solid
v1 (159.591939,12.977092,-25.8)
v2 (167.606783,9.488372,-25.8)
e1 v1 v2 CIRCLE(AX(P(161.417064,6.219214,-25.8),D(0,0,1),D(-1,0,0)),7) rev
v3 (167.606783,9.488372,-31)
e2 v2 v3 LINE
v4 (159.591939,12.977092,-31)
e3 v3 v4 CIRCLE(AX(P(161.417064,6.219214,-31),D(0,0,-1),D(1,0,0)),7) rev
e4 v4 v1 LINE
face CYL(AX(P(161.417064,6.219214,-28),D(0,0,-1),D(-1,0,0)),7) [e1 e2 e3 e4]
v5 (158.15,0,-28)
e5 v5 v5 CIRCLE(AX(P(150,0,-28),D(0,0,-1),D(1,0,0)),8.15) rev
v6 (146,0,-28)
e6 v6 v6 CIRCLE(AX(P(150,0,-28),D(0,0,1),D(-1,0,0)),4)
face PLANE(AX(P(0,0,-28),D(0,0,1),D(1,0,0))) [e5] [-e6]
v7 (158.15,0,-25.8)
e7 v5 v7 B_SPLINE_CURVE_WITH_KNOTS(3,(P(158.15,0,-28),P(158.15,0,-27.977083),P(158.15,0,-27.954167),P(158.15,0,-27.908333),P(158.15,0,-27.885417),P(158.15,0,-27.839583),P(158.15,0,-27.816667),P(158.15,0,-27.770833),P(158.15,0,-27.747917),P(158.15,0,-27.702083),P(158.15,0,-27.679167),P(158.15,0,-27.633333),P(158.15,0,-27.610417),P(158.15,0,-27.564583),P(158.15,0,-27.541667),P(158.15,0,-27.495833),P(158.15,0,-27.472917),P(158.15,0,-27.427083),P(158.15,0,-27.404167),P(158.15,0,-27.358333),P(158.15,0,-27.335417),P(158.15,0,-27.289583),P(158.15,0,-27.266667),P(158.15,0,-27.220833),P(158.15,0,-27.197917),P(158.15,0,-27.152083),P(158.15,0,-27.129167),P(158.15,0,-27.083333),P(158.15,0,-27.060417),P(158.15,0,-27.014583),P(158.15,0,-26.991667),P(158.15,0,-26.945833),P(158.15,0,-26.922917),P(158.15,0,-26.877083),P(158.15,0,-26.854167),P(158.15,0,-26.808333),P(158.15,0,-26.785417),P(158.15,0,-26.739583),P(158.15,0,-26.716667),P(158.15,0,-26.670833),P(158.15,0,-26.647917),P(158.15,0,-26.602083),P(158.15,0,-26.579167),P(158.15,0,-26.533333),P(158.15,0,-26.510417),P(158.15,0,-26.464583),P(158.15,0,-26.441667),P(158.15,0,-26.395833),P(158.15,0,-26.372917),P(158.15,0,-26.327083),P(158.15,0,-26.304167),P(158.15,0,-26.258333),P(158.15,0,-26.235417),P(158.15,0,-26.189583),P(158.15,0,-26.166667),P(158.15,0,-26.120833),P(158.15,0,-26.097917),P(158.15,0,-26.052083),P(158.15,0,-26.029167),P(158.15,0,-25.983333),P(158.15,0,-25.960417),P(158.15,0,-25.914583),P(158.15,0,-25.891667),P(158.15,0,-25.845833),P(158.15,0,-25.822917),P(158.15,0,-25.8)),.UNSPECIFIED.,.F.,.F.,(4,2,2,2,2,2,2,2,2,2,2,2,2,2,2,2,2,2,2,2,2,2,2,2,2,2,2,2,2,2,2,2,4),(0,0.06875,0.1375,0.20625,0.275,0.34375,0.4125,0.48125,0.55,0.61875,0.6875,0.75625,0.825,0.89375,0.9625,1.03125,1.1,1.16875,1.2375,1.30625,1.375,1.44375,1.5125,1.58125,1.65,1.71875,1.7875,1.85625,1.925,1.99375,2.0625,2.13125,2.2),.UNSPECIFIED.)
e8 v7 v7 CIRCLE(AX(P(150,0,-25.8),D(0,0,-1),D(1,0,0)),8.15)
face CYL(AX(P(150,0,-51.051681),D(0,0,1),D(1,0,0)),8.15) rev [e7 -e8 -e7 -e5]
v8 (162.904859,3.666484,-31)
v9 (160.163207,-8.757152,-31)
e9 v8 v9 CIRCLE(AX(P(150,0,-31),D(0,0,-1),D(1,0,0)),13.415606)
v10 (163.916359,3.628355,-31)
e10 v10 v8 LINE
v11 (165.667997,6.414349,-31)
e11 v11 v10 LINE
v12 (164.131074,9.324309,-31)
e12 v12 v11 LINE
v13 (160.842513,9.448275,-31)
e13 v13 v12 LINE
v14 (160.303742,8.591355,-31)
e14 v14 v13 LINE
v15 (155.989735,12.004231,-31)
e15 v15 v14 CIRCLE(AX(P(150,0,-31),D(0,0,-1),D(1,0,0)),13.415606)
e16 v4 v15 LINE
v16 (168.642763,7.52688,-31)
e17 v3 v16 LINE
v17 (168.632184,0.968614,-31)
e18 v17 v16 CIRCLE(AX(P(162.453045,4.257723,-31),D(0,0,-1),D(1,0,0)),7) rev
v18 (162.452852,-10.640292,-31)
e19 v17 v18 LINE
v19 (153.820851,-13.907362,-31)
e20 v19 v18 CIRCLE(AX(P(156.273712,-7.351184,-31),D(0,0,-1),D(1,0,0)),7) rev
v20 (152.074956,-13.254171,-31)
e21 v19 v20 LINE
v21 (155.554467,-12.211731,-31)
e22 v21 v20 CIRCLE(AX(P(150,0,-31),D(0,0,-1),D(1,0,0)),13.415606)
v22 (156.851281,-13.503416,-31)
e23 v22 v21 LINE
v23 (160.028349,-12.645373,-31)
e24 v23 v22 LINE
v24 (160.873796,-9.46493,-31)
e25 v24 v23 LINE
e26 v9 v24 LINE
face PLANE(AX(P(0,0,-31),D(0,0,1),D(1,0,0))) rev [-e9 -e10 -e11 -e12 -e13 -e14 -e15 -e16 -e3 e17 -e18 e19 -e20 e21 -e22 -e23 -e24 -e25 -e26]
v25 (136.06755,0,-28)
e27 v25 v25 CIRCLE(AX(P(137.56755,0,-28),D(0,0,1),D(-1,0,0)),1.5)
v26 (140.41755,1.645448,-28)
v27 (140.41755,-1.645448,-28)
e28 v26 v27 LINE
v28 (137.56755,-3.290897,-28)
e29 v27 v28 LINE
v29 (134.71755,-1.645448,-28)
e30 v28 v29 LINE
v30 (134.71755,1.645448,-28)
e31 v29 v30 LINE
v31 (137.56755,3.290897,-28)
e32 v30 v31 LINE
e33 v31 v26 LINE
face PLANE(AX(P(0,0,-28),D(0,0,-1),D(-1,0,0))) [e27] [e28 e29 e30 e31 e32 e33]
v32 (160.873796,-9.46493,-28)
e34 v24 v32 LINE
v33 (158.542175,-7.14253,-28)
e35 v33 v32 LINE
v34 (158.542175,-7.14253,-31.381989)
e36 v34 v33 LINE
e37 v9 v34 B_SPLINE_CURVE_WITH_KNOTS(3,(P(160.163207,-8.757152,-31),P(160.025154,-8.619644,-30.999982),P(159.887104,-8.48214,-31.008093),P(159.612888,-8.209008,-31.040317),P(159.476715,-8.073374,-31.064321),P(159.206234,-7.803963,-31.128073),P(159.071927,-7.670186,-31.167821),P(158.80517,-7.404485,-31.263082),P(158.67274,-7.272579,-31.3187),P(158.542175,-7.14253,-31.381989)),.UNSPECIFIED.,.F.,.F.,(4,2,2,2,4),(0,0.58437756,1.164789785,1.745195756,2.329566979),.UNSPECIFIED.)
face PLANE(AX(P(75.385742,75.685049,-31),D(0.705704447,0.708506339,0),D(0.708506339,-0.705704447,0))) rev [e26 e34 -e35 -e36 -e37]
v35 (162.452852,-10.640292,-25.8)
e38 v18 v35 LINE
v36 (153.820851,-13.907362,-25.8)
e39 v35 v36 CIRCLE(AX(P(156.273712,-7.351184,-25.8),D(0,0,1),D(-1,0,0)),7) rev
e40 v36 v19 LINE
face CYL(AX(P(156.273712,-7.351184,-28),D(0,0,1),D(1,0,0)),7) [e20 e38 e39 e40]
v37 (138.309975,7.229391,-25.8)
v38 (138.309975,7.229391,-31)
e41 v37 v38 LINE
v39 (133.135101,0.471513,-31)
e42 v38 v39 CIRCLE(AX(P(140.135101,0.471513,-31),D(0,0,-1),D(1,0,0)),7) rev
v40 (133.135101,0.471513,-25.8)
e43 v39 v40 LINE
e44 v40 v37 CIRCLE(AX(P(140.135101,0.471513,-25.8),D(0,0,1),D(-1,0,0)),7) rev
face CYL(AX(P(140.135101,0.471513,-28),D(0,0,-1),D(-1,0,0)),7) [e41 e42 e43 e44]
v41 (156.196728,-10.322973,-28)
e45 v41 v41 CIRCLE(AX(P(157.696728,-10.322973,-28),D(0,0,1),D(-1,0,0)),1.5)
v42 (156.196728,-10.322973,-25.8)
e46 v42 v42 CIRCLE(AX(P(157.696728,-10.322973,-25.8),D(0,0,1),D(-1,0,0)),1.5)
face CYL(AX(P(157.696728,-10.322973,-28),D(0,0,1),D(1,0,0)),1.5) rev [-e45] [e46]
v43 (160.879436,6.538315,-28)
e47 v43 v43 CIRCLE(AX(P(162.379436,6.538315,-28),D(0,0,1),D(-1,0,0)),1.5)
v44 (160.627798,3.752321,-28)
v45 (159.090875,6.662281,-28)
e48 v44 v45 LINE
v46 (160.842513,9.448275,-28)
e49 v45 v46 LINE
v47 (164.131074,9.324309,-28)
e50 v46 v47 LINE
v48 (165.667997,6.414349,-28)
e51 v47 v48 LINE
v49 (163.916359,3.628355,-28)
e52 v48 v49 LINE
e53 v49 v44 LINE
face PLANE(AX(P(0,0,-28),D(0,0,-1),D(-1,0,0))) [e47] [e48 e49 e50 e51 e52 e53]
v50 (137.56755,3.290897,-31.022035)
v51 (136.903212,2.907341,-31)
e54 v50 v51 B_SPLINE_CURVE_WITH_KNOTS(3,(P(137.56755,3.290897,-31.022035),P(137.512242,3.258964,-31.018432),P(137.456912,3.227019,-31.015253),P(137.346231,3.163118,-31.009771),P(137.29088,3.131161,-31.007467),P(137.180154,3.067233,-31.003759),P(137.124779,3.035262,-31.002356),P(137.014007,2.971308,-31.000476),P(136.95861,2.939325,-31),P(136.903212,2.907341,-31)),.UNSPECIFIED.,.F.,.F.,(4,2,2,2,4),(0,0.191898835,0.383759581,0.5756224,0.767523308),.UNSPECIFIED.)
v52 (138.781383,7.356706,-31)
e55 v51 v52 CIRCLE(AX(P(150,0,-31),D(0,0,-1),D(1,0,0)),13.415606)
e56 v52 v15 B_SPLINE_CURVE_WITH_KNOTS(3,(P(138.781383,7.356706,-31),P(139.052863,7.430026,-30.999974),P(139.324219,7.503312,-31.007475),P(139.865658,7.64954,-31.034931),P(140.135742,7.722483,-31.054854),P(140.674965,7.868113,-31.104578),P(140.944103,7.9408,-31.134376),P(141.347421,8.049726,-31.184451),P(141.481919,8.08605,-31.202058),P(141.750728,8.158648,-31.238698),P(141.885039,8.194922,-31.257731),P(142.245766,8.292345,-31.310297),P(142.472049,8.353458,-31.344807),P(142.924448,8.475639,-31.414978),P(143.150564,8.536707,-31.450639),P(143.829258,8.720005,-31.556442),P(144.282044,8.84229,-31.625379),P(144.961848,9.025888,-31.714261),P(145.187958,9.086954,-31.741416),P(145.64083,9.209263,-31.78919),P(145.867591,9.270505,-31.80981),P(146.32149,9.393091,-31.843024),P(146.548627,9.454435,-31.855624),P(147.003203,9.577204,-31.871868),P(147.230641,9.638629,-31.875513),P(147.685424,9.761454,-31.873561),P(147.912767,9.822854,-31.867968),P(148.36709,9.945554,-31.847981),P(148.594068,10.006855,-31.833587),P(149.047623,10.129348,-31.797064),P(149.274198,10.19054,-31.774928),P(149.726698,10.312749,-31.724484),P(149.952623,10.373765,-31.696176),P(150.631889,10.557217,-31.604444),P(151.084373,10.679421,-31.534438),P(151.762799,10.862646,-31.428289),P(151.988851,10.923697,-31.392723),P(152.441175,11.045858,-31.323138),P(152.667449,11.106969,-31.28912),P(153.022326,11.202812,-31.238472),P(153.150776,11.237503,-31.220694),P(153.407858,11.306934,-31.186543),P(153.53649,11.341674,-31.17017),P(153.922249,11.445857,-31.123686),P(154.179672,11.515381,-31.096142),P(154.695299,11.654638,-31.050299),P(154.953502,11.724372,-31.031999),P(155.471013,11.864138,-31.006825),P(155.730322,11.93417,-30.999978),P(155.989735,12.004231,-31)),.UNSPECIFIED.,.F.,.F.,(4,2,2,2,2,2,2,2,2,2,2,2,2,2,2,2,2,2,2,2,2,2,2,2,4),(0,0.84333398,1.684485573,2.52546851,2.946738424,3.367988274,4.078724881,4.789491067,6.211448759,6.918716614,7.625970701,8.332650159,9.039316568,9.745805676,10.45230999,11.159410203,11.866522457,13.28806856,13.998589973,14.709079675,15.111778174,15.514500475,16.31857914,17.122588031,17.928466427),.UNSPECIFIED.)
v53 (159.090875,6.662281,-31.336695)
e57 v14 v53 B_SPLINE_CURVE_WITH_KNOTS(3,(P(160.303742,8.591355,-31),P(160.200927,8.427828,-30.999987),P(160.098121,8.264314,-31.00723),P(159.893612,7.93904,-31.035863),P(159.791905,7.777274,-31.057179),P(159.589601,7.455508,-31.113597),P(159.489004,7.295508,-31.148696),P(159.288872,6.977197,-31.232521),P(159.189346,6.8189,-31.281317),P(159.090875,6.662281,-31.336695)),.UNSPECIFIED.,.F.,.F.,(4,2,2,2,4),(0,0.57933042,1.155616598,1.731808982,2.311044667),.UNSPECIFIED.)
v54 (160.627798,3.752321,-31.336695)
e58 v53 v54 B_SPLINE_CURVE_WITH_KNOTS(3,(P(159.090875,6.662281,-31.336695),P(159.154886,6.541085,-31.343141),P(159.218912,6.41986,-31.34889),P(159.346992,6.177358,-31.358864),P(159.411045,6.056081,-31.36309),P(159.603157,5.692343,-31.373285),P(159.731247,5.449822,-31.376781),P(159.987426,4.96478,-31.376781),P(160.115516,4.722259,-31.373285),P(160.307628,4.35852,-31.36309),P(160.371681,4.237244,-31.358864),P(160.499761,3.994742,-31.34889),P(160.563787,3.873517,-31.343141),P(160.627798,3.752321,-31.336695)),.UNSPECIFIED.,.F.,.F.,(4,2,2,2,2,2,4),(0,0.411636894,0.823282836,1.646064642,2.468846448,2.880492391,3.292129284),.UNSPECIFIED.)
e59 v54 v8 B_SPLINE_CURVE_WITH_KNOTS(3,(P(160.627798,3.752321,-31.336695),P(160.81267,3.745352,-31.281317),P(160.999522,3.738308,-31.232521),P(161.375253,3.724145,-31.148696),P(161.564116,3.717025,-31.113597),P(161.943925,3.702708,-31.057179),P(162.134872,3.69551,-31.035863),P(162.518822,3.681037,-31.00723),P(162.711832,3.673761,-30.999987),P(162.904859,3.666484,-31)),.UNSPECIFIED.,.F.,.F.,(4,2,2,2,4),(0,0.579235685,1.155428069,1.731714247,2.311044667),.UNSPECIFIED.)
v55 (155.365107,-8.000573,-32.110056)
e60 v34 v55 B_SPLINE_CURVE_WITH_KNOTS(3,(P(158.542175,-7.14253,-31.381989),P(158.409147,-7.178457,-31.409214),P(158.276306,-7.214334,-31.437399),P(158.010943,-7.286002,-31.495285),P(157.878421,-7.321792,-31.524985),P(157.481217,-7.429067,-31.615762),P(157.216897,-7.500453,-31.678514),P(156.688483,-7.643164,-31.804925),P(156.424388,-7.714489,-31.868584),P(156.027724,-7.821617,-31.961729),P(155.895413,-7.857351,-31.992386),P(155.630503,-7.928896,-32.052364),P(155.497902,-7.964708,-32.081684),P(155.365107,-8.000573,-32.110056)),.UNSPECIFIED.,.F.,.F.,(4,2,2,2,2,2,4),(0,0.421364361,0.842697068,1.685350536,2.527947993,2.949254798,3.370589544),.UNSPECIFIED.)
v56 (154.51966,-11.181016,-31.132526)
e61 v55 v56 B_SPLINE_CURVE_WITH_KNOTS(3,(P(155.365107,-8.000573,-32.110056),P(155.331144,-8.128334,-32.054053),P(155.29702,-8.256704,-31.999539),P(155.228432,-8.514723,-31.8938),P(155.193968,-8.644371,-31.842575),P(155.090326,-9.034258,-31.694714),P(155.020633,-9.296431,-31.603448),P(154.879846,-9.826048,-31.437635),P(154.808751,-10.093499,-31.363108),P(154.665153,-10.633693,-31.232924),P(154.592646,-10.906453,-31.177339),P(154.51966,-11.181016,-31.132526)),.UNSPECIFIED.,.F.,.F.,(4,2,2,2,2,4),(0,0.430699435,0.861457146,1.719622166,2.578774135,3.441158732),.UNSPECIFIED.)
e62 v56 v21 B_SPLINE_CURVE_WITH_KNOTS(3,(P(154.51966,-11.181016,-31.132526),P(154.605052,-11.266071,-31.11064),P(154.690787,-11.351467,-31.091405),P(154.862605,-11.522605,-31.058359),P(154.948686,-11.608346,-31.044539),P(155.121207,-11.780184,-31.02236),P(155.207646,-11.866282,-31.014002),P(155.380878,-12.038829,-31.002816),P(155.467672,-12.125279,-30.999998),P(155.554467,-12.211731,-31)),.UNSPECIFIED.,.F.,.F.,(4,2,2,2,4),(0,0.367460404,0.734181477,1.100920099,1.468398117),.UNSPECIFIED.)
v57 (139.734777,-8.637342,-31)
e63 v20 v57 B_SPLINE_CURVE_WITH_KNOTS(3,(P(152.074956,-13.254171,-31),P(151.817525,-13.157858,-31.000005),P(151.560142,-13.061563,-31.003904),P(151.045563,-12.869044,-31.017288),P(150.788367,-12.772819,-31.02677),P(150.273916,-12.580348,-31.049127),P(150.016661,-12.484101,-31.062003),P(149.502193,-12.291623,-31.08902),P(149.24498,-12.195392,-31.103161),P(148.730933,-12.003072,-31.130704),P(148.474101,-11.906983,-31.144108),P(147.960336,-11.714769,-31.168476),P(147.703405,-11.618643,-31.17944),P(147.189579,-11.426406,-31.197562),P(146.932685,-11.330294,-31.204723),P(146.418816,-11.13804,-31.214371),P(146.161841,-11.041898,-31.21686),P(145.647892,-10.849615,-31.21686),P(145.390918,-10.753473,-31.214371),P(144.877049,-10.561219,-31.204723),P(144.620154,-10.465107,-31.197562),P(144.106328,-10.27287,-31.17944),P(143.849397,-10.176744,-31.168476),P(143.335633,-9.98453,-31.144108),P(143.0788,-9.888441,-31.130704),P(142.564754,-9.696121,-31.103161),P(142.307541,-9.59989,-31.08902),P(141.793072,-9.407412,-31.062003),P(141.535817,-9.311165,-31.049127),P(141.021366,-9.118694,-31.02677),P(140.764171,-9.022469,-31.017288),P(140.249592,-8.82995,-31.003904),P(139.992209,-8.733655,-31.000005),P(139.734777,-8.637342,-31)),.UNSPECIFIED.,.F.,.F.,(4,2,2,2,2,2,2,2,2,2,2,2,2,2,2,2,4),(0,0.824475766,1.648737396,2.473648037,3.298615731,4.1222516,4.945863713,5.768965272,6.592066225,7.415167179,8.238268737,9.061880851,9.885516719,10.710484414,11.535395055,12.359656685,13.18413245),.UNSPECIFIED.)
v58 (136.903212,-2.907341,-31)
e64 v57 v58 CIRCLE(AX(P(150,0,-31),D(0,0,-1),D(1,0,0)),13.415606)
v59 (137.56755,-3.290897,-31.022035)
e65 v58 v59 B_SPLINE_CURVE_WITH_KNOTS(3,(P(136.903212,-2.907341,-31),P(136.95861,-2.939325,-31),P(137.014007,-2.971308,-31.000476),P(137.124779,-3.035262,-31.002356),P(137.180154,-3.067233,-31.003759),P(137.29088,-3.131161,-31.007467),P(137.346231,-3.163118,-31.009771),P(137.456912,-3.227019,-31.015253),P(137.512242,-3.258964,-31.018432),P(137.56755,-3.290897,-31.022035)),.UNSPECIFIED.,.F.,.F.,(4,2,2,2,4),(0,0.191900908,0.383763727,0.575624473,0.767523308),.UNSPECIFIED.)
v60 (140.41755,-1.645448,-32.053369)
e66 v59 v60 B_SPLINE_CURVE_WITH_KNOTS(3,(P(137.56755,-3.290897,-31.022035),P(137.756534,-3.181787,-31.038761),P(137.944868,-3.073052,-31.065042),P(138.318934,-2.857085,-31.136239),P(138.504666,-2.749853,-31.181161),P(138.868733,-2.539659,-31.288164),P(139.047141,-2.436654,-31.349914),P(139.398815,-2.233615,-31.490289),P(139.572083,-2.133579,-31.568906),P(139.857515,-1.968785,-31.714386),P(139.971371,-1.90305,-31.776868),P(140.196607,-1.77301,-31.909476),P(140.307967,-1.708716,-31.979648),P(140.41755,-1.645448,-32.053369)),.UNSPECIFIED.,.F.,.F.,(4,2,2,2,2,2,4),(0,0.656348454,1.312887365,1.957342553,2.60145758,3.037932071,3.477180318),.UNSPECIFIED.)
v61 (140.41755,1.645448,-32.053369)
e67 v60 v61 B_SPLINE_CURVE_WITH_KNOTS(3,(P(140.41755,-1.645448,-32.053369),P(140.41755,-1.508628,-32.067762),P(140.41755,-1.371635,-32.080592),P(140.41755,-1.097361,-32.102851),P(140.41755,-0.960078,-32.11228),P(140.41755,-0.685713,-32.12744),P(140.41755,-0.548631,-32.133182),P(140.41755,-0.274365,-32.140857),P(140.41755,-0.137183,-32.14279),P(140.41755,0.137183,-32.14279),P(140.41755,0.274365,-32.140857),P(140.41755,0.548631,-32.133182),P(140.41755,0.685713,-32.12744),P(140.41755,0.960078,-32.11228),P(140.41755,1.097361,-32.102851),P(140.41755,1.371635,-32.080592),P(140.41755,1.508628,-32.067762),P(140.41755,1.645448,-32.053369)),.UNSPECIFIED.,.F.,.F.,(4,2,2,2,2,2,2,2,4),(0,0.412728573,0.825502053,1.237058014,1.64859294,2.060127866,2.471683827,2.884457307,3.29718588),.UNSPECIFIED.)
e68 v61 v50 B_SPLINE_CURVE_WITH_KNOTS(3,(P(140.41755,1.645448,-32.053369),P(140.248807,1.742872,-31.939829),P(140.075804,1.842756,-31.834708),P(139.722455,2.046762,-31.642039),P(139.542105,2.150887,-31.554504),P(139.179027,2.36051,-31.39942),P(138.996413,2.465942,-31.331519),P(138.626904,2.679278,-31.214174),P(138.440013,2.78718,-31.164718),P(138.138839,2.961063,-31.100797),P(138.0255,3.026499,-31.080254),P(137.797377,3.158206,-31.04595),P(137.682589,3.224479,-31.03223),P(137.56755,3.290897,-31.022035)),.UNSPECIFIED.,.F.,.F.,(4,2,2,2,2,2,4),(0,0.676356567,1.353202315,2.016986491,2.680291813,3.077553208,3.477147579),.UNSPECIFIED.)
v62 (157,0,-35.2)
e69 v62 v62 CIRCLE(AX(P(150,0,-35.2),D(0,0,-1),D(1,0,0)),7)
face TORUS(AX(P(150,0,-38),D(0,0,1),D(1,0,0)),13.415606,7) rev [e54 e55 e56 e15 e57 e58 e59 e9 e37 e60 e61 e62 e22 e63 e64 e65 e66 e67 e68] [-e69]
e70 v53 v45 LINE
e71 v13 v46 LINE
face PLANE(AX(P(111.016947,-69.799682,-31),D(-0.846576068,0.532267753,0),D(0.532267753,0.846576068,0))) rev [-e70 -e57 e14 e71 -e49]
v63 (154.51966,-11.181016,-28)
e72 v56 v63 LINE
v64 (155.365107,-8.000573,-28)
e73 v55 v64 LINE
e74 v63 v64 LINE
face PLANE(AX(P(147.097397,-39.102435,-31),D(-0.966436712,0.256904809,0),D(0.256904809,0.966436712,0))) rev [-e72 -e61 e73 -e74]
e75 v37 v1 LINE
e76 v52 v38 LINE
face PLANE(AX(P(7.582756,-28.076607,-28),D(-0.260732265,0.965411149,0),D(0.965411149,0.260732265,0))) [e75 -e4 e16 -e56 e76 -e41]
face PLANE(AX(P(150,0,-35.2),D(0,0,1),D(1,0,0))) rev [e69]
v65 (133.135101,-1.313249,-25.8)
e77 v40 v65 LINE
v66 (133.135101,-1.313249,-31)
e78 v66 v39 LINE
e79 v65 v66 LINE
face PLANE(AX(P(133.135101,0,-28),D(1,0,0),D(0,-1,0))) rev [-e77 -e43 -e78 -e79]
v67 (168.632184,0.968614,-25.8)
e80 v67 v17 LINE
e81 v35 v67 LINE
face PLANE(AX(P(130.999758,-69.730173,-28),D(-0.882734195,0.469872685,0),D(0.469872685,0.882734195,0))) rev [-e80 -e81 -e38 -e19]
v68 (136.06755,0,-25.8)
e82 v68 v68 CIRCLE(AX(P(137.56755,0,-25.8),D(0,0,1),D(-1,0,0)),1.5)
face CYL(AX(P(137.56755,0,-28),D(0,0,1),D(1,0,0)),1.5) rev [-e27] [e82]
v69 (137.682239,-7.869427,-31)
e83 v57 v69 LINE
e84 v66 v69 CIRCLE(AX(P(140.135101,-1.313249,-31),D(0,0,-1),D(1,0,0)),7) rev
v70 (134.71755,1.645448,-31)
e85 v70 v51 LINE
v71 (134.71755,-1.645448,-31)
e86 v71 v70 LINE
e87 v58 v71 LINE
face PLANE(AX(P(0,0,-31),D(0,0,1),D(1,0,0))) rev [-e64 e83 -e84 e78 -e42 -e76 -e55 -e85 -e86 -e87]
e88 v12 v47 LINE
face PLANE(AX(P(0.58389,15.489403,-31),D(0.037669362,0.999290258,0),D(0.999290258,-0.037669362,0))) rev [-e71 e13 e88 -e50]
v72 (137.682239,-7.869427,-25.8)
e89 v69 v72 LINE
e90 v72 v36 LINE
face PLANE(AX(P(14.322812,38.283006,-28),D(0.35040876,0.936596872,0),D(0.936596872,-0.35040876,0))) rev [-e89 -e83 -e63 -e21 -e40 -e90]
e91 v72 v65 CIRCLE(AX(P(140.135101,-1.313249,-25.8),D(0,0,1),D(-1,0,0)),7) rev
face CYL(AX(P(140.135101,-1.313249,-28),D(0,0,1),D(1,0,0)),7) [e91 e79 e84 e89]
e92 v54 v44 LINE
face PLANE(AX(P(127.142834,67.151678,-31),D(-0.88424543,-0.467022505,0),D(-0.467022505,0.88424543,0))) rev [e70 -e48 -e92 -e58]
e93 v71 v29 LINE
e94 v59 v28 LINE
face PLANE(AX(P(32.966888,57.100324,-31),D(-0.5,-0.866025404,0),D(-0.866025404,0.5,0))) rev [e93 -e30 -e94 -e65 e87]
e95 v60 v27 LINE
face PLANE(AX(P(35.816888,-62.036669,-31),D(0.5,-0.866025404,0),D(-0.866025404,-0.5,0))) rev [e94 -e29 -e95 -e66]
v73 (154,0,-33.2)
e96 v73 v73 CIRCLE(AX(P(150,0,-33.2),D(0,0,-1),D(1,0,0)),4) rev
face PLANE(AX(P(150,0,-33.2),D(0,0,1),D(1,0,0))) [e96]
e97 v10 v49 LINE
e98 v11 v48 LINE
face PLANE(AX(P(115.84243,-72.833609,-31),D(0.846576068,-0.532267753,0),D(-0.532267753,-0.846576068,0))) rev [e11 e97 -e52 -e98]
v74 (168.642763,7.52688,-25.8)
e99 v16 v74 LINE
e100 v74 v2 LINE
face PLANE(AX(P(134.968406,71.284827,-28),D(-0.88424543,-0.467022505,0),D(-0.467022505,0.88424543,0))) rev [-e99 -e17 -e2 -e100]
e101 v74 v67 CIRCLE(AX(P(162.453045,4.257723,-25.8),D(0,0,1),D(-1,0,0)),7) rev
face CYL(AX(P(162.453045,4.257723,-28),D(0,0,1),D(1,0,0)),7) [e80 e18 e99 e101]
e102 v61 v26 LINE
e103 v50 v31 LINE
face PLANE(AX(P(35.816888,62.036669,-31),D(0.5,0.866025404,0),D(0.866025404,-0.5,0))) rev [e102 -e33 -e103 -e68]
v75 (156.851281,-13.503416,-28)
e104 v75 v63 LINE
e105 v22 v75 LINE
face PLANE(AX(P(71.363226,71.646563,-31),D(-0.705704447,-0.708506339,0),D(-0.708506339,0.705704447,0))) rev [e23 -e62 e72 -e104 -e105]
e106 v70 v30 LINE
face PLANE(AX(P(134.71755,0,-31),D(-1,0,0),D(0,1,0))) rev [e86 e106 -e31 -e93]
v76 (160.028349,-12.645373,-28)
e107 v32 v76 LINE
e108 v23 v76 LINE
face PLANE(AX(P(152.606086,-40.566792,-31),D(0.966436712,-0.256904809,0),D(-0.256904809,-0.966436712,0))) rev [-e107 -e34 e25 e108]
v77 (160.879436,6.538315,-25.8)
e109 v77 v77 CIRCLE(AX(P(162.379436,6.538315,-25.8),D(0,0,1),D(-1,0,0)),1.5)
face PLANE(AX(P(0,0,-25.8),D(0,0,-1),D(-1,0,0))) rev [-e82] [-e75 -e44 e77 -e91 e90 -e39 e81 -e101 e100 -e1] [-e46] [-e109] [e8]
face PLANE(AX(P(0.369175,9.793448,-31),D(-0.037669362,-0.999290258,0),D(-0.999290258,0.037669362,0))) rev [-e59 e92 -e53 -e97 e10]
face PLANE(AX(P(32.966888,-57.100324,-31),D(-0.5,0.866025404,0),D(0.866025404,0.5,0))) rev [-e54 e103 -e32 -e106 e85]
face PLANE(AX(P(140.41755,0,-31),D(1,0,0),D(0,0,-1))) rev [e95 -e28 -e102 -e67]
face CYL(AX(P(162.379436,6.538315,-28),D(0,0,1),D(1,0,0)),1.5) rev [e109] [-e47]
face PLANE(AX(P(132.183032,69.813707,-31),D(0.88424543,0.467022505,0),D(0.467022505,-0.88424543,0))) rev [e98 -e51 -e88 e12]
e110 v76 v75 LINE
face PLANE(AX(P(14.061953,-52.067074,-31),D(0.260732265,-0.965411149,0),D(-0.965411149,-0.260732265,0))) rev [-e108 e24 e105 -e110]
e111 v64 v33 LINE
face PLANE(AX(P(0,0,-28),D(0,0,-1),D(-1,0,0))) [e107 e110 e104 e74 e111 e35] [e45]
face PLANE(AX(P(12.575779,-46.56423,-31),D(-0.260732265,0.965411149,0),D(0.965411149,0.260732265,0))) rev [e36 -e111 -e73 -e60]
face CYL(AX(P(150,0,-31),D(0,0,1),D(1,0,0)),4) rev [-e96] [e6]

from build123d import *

# Parameters (mm, degrees)
SKETCH1_R           = 8
SKETCH1_R_2         = 1.5
BOSS_EXTRUDE1_DEPTH = 2.2
BOSS_EXTRUDE2_START = 2.2
SKETCH1_3_R         = 8
SKETCH1_3_R_2       = 4
BOSS_EXTRUDE2_DEPTH = 3
FILLET1_R           = 7
CUT_EXTRUDE2_START  = -5.2
SKETCH2_R           = 8.05
SKETCH2_R_2         = 7
CUT_EXTRUDE2_DEPTH  = 2.2
SKETCH2_4_R         = 7
SKETCH2_4_R_2       = 4
BOSS_EXTRUDE3_DEPTH = 2.2
BOSS_EXTRUDE4_START = 2.2
SKETCH2_5_R         = 7
SKETCH2_5_R_2       = 4
BOSS_EXTRUDE4_DEPTH = 2
FILLET2_START       = -35.2
FILLET2_2_DEPTH     = 4.2
SKETCH3_R           = 8.15
SKETCH3_R_2         = 8.05
CUT_EXTRUDE3_DEPTH  = 2.2


with BuildPart() as part:
    # Sketch1 → Boss-Extrude1 (new body)
    # profile 1 of 4: a face of its own
    with BuildSketch(Plane(origin=(0, 0, -25.8), x_dir=(-1, 0, 0), z_dir=(0, 0, -1))):
        Polygon((-133.135100578, -5.831793049), (-133.135100578, 6.168206951), (-159.569076944, 16.05794409), (-170.376148703, -4.244942404), (-164.993668486, -14.43595779), align=None)
        with Locations((-150, 0)):
            Circle(SKETCH1_R, mode=Mode.SUBTRACT)
        Polygon((-165.667996862, -6.414349097), (-164.131074119, -9.324309317), (-160.842513273, -9.448275288), (-159.09087517, -6.662281039), (-160.627797913, -3.752320819), (-163.916358759, -3.628354848), align=None, mode=Mode.SUBTRACT)
        Polygon((-140.417550289, 1.645448267), (-140.417550289, -1.645448267), (-137.567550289, -3.290896534), (-134.717550289, -1.645448267), (-134.717550289, 1.645448267), (-137.567550289, 3.290896534), align=None, mode=Mode.SUBTRACT)
        Polygon((-160.873796009, 9.464930151), (-158.542174952, 7.142529831), (-155.365106749, 8.000572737), (-154.519659602, 11.181015965), (-156.851280658, 13.503416285), (-160.028348862, 12.645373378), align=None, mode=Mode.SUBTRACT)
    # profile 2 of 4: a face of its own
    with BuildSketch(Plane(origin=(0, 0, -25.8), x_dir=(-1, 0, 0), z_dir=(0, 0, -1))):
        Polygon((-163.916358759, -3.628354848), (-165.667996862, -6.414349097), (-164.131074119, -9.324309317), (-160.842513273, -9.448275288), (-159.09087517, -6.662281039), (-160.627797913, -3.752320819), align=None)
        with Locations((-162.379436016, -6.538315068)):
            Circle(SKETCH1_R_2, mode=Mode.SUBTRACT)
    # profile 3 of 4: a face of its own
    with BuildSketch(Plane(origin=(0, 0, -25.8), x_dir=(-1, 0, 0), z_dir=(0, 0, -1))):
        Polygon((-160.028348862, 12.645373378), (-160.873796009, 9.464930151), (-158.542174952, 7.142529831), (-155.365106749, 8.000572737), (-154.519659602, 11.181015965), (-156.851280658, 13.503416285), align=None)
        with Locations((-157.696727805, 10.322973058)):
            Circle(SKETCH1_R_2, mode=Mode.SUBTRACT)
    # profile 4 of 4: a face of its own
    with BuildSketch(Plane(origin=(0, 0, -25.8), x_dir=(-1, 0, 0), z_dir=(0, 0, -1))):
        Polygon((-137.567550289, 3.290896534), (-140.417550289, 1.645448267), (-140.417550289, -1.645448267), (-137.567550289, -3.290896534), (-134.717550289, -1.645448267), (-134.717550289, 1.645448267), align=None)
        with Locations((-137.567550289, 0)):
            Circle(SKETCH1_R_2, mode=Mode.SUBTRACT)
    extrude(amount=BOSS_EXTRUDE1_DEPTH)

    # Sketch1<3> → Boss-Extrude2 (add)
    # profile 1 of 2: a face of its own
    with BuildSketch(Plane(origin=(0, 0, -25.8), x_dir=(-1, 0, 0), z_dir=(0, 0, -1)).offset(BOSS_EXTRUDE2_START)):
        Polygon((-133.135100578, -5.831793049), (-133.135100578, 6.168206951), (-159.569076944, 16.05794409), (-170.376148703, -4.244942404), (-164.993668486, -14.43595779), align=None)
        with Locations((-150, 0)):
            Circle(SKETCH1_3_R, mode=Mode.SUBTRACT)
        Polygon((-165.667996862, -6.414349097), (-164.131074119, -9.324309317), (-160.842513273, -9.448275288), (-159.09087517, -6.662281039), (-160.627797913, -3.752320819), (-163.916358759, -3.628354848), align=None, mode=Mode.SUBTRACT)
        Polygon((-140.417550289, 1.645448267), (-140.417550289, -1.645448267), (-137.567550289, -3.290896534), (-134.717550289, -1.645448267), (-134.717550289, 1.645448267), (-137.567550289, 3.290896534), align=None, mode=Mode.SUBTRACT)
        Polygon((-160.873796009, 9.464930151), (-158.542174952, 7.142529831), (-155.365106749, 8.000572737), (-154.519659602, 11.181015965), (-156.851280658, 13.503416285), (-160.028348862, 12.645373378), align=None, mode=Mode.SUBTRACT)
    # profile 2 of 2: a face of its own
    with BuildSketch(Plane(origin=(0, 0, -25.8), x_dir=(-1, 0, 0), z_dir=(0, 0, -1)).offset(BOSS_EXTRUDE2_START)):
        with Locations((-150, 0)):
            Circle(SKETCH1_3_R)
        with Locations((-150, 0)):
            Circle(SKETCH1_3_R_2, mode=Mode.SUBTRACT)
    extrude(amount=BOSS_EXTRUDE2_DEPTH)

    # Fillet1
    fillet1_edges = [part.edges().sort_by_distance(p)[0] for p in [
        (133.135100578, -5.831793049, -28.4),
        (164.993668486, -14.43595779, -28.4),
        (170.376148703, -4.244942404, -28.4),
        (159.569076944, 16.05794409, -28.4),
        (133.135100578, 6.168206951, -28.4),
    ]]
    fillet(fillet1_edges, radius=FILLET1_R)

    # Sketch2 → Cut-Extrude2 (cut)
    with BuildSketch(Plane(origin=(0, 0, -31), x_dir=(-1, 0, 0), z_dir=(0, 0, -1)).offset(CUT_EXTRUDE2_START)):
        with Locations(Location((-150, 0, 0), (0, 0, 180))):
            Circle(SKETCH2_R)
        with Locations((-150, 0)):
            Circle(SKETCH2_R_2, mode=Mode.SUBTRACT)
    extrude(amount=CUT_EXTRUDE2_DEPTH, mode=Mode.SUBTRACT)

    # Sketch2<4> → Boss-Extrude3 (add)
    with BuildSketch(Plane(origin=(0, 0, -31), x_dir=(-1, 0, 0), z_dir=(0, 0, -1))):
        with Locations(Location((-150, 0, 0), (0, 0, 180))):
            Circle(SKETCH2_4_R)
        with Locations(Location((-150, 0, 0), (0, 0, 180))):
            Circle(SKETCH2_4_R_2, mode=Mode.SUBTRACT)
    extrude(amount=BOSS_EXTRUDE3_DEPTH)

    # Sketch2<5> → Boss-Extrude4 (add)
    # profile 1 of 2: a face of its own
    with BuildSketch(Plane(origin=(0, 0, -31), x_dir=(-1, 0, 0), z_dir=(0, 0, -1)).offset(BOSS_EXTRUDE4_START)):
        with Locations(Location((-150, 0, 0), (0, 0, 180))):
            Circle(SKETCH2_5_R)
        with Locations(Location((-150, 0, 0), (0, 0, 180))):
            Circle(SKETCH2_5_R_2, mode=Mode.SUBTRACT)
    # profile 2 of 2: a face of its own
    with BuildSketch(Plane(origin=(0, 0, -31), x_dir=(-1, 0, 0), z_dir=(0, 0, -1)).offset(BOSS_EXTRUDE4_START)):
        with Locations(Location((-150, 0, 0), (0, 0, 180))):
            Circle(SKETCH2_5_R_2)
    extrude(amount=BOSS_EXTRUDE4_DEPTH)

    # Fillet2: read off the stored shape, not the designer's step
    # Fillet2 outline → Fillet2 (revolve)
    with BuildSketch(Plane(origin=(150, 0, 0), x_dir=(1, 0, 0), z_dir=(0, -1, 0))):
        with BuildLine():
            ThreePointArc((7, -35.2), (9.58154807, -32.143379814), (13.415605973, -31))
            Line((13.415605973, -31), (7, -31))
            Line((7, -31), (7, -35.2))
        make_face()
    revolve(axis=Axis((150, 0, 0), (0, 0, 1)))

    # Fillet2 2 outline → Fillet2 2 (cut)
    with BuildSketch(Plane.XY.offset(FILLET2_START)):
        with BuildLine():
            Line((140.417550289, 1.645448267), (137.567550289, 3.290896534))
            Line((137.567550289, 3.290896534), (136.903212084, 2.907340693))
            ThreePointArc((136.903212084, 2.907340693), (136.584394027, 0), (136.903212084, -2.907340693))
            Line((136.903212084, -2.907340693), (137.567550289, -3.290896534))
            Line((137.567550289, -3.290896534), (140.417550289, -1.645448267))
            Line((140.417550289, -1.645448267), (140.417550289, 1.645448267))
        make_face()
        with BuildLine():
            Line((159.09087517, -6.662281039), (160.303741962, -8.59135526))
            ThreePointArc((160.303741962, -8.59135526), (161.862688268, -6.265389906), (162.904858589, -3.666484475))
            Line((162.904858589, -3.666484475), (160.627797913, -3.752320819))
            Line((160.627797913, -3.752320819), (159.09087517, -6.662281039))
        make_face()
        with BuildLine():
            Line((155.989734556, -12.004231069), (138.781383409, -7.356706152))
            ThreePointArc((138.781383409, -7.356706152), (146.50211867, -12.951575573), (155.989734556, -12.004231069))
        make_face()
        with BuildLine():
            ThreePointArc((152.074956497, 13.254170633), (145.29905415, 12.565014594), (139.734777095, 8.637342318))
            Line((139.734777095, 8.637342318), (152.074956497, 13.254170633))
        make_face()
        with BuildLine():
            Line((155.365106749, 8.000572737), (158.542174952, 7.142529831))
            Line((158.542174952, 7.142529831), (160.163207231, 8.7571515))
            ThreePointArc((160.163207231, 8.7571515), (158.046418581, 10.7346929), (155.554467123, 12.211731188))
            Line((155.554467123, 12.211731188), (154.519659602, 11.181015965))
            Line((154.519659602, 11.181015965), (155.365106749, 8.000572737))
        make_face()
    extrude(amount=FILLET2_2_DEPTH, mode=Mode.SUBTRACT)

    # Sketch3 → Cut-Extrude3 (cut)
    with BuildSketch(Plane.XY.offset(-25.8)):
        with Locations((150, 0)):
            Circle(SKETCH3_R)
        with Locations((150, 0)):
            Circle(SKETCH3_R_2, mode=Mode.SUBTRACT)
    extrude(amount=-CUT_EXTRUDE3_DEPTH, mode=Mode.SUBTRACT)


with BuildPart() as body_2:
    # Mirror3: mirrored copy
    add(part.part.mirror(Plane.ZX))


solid = body_2.part
